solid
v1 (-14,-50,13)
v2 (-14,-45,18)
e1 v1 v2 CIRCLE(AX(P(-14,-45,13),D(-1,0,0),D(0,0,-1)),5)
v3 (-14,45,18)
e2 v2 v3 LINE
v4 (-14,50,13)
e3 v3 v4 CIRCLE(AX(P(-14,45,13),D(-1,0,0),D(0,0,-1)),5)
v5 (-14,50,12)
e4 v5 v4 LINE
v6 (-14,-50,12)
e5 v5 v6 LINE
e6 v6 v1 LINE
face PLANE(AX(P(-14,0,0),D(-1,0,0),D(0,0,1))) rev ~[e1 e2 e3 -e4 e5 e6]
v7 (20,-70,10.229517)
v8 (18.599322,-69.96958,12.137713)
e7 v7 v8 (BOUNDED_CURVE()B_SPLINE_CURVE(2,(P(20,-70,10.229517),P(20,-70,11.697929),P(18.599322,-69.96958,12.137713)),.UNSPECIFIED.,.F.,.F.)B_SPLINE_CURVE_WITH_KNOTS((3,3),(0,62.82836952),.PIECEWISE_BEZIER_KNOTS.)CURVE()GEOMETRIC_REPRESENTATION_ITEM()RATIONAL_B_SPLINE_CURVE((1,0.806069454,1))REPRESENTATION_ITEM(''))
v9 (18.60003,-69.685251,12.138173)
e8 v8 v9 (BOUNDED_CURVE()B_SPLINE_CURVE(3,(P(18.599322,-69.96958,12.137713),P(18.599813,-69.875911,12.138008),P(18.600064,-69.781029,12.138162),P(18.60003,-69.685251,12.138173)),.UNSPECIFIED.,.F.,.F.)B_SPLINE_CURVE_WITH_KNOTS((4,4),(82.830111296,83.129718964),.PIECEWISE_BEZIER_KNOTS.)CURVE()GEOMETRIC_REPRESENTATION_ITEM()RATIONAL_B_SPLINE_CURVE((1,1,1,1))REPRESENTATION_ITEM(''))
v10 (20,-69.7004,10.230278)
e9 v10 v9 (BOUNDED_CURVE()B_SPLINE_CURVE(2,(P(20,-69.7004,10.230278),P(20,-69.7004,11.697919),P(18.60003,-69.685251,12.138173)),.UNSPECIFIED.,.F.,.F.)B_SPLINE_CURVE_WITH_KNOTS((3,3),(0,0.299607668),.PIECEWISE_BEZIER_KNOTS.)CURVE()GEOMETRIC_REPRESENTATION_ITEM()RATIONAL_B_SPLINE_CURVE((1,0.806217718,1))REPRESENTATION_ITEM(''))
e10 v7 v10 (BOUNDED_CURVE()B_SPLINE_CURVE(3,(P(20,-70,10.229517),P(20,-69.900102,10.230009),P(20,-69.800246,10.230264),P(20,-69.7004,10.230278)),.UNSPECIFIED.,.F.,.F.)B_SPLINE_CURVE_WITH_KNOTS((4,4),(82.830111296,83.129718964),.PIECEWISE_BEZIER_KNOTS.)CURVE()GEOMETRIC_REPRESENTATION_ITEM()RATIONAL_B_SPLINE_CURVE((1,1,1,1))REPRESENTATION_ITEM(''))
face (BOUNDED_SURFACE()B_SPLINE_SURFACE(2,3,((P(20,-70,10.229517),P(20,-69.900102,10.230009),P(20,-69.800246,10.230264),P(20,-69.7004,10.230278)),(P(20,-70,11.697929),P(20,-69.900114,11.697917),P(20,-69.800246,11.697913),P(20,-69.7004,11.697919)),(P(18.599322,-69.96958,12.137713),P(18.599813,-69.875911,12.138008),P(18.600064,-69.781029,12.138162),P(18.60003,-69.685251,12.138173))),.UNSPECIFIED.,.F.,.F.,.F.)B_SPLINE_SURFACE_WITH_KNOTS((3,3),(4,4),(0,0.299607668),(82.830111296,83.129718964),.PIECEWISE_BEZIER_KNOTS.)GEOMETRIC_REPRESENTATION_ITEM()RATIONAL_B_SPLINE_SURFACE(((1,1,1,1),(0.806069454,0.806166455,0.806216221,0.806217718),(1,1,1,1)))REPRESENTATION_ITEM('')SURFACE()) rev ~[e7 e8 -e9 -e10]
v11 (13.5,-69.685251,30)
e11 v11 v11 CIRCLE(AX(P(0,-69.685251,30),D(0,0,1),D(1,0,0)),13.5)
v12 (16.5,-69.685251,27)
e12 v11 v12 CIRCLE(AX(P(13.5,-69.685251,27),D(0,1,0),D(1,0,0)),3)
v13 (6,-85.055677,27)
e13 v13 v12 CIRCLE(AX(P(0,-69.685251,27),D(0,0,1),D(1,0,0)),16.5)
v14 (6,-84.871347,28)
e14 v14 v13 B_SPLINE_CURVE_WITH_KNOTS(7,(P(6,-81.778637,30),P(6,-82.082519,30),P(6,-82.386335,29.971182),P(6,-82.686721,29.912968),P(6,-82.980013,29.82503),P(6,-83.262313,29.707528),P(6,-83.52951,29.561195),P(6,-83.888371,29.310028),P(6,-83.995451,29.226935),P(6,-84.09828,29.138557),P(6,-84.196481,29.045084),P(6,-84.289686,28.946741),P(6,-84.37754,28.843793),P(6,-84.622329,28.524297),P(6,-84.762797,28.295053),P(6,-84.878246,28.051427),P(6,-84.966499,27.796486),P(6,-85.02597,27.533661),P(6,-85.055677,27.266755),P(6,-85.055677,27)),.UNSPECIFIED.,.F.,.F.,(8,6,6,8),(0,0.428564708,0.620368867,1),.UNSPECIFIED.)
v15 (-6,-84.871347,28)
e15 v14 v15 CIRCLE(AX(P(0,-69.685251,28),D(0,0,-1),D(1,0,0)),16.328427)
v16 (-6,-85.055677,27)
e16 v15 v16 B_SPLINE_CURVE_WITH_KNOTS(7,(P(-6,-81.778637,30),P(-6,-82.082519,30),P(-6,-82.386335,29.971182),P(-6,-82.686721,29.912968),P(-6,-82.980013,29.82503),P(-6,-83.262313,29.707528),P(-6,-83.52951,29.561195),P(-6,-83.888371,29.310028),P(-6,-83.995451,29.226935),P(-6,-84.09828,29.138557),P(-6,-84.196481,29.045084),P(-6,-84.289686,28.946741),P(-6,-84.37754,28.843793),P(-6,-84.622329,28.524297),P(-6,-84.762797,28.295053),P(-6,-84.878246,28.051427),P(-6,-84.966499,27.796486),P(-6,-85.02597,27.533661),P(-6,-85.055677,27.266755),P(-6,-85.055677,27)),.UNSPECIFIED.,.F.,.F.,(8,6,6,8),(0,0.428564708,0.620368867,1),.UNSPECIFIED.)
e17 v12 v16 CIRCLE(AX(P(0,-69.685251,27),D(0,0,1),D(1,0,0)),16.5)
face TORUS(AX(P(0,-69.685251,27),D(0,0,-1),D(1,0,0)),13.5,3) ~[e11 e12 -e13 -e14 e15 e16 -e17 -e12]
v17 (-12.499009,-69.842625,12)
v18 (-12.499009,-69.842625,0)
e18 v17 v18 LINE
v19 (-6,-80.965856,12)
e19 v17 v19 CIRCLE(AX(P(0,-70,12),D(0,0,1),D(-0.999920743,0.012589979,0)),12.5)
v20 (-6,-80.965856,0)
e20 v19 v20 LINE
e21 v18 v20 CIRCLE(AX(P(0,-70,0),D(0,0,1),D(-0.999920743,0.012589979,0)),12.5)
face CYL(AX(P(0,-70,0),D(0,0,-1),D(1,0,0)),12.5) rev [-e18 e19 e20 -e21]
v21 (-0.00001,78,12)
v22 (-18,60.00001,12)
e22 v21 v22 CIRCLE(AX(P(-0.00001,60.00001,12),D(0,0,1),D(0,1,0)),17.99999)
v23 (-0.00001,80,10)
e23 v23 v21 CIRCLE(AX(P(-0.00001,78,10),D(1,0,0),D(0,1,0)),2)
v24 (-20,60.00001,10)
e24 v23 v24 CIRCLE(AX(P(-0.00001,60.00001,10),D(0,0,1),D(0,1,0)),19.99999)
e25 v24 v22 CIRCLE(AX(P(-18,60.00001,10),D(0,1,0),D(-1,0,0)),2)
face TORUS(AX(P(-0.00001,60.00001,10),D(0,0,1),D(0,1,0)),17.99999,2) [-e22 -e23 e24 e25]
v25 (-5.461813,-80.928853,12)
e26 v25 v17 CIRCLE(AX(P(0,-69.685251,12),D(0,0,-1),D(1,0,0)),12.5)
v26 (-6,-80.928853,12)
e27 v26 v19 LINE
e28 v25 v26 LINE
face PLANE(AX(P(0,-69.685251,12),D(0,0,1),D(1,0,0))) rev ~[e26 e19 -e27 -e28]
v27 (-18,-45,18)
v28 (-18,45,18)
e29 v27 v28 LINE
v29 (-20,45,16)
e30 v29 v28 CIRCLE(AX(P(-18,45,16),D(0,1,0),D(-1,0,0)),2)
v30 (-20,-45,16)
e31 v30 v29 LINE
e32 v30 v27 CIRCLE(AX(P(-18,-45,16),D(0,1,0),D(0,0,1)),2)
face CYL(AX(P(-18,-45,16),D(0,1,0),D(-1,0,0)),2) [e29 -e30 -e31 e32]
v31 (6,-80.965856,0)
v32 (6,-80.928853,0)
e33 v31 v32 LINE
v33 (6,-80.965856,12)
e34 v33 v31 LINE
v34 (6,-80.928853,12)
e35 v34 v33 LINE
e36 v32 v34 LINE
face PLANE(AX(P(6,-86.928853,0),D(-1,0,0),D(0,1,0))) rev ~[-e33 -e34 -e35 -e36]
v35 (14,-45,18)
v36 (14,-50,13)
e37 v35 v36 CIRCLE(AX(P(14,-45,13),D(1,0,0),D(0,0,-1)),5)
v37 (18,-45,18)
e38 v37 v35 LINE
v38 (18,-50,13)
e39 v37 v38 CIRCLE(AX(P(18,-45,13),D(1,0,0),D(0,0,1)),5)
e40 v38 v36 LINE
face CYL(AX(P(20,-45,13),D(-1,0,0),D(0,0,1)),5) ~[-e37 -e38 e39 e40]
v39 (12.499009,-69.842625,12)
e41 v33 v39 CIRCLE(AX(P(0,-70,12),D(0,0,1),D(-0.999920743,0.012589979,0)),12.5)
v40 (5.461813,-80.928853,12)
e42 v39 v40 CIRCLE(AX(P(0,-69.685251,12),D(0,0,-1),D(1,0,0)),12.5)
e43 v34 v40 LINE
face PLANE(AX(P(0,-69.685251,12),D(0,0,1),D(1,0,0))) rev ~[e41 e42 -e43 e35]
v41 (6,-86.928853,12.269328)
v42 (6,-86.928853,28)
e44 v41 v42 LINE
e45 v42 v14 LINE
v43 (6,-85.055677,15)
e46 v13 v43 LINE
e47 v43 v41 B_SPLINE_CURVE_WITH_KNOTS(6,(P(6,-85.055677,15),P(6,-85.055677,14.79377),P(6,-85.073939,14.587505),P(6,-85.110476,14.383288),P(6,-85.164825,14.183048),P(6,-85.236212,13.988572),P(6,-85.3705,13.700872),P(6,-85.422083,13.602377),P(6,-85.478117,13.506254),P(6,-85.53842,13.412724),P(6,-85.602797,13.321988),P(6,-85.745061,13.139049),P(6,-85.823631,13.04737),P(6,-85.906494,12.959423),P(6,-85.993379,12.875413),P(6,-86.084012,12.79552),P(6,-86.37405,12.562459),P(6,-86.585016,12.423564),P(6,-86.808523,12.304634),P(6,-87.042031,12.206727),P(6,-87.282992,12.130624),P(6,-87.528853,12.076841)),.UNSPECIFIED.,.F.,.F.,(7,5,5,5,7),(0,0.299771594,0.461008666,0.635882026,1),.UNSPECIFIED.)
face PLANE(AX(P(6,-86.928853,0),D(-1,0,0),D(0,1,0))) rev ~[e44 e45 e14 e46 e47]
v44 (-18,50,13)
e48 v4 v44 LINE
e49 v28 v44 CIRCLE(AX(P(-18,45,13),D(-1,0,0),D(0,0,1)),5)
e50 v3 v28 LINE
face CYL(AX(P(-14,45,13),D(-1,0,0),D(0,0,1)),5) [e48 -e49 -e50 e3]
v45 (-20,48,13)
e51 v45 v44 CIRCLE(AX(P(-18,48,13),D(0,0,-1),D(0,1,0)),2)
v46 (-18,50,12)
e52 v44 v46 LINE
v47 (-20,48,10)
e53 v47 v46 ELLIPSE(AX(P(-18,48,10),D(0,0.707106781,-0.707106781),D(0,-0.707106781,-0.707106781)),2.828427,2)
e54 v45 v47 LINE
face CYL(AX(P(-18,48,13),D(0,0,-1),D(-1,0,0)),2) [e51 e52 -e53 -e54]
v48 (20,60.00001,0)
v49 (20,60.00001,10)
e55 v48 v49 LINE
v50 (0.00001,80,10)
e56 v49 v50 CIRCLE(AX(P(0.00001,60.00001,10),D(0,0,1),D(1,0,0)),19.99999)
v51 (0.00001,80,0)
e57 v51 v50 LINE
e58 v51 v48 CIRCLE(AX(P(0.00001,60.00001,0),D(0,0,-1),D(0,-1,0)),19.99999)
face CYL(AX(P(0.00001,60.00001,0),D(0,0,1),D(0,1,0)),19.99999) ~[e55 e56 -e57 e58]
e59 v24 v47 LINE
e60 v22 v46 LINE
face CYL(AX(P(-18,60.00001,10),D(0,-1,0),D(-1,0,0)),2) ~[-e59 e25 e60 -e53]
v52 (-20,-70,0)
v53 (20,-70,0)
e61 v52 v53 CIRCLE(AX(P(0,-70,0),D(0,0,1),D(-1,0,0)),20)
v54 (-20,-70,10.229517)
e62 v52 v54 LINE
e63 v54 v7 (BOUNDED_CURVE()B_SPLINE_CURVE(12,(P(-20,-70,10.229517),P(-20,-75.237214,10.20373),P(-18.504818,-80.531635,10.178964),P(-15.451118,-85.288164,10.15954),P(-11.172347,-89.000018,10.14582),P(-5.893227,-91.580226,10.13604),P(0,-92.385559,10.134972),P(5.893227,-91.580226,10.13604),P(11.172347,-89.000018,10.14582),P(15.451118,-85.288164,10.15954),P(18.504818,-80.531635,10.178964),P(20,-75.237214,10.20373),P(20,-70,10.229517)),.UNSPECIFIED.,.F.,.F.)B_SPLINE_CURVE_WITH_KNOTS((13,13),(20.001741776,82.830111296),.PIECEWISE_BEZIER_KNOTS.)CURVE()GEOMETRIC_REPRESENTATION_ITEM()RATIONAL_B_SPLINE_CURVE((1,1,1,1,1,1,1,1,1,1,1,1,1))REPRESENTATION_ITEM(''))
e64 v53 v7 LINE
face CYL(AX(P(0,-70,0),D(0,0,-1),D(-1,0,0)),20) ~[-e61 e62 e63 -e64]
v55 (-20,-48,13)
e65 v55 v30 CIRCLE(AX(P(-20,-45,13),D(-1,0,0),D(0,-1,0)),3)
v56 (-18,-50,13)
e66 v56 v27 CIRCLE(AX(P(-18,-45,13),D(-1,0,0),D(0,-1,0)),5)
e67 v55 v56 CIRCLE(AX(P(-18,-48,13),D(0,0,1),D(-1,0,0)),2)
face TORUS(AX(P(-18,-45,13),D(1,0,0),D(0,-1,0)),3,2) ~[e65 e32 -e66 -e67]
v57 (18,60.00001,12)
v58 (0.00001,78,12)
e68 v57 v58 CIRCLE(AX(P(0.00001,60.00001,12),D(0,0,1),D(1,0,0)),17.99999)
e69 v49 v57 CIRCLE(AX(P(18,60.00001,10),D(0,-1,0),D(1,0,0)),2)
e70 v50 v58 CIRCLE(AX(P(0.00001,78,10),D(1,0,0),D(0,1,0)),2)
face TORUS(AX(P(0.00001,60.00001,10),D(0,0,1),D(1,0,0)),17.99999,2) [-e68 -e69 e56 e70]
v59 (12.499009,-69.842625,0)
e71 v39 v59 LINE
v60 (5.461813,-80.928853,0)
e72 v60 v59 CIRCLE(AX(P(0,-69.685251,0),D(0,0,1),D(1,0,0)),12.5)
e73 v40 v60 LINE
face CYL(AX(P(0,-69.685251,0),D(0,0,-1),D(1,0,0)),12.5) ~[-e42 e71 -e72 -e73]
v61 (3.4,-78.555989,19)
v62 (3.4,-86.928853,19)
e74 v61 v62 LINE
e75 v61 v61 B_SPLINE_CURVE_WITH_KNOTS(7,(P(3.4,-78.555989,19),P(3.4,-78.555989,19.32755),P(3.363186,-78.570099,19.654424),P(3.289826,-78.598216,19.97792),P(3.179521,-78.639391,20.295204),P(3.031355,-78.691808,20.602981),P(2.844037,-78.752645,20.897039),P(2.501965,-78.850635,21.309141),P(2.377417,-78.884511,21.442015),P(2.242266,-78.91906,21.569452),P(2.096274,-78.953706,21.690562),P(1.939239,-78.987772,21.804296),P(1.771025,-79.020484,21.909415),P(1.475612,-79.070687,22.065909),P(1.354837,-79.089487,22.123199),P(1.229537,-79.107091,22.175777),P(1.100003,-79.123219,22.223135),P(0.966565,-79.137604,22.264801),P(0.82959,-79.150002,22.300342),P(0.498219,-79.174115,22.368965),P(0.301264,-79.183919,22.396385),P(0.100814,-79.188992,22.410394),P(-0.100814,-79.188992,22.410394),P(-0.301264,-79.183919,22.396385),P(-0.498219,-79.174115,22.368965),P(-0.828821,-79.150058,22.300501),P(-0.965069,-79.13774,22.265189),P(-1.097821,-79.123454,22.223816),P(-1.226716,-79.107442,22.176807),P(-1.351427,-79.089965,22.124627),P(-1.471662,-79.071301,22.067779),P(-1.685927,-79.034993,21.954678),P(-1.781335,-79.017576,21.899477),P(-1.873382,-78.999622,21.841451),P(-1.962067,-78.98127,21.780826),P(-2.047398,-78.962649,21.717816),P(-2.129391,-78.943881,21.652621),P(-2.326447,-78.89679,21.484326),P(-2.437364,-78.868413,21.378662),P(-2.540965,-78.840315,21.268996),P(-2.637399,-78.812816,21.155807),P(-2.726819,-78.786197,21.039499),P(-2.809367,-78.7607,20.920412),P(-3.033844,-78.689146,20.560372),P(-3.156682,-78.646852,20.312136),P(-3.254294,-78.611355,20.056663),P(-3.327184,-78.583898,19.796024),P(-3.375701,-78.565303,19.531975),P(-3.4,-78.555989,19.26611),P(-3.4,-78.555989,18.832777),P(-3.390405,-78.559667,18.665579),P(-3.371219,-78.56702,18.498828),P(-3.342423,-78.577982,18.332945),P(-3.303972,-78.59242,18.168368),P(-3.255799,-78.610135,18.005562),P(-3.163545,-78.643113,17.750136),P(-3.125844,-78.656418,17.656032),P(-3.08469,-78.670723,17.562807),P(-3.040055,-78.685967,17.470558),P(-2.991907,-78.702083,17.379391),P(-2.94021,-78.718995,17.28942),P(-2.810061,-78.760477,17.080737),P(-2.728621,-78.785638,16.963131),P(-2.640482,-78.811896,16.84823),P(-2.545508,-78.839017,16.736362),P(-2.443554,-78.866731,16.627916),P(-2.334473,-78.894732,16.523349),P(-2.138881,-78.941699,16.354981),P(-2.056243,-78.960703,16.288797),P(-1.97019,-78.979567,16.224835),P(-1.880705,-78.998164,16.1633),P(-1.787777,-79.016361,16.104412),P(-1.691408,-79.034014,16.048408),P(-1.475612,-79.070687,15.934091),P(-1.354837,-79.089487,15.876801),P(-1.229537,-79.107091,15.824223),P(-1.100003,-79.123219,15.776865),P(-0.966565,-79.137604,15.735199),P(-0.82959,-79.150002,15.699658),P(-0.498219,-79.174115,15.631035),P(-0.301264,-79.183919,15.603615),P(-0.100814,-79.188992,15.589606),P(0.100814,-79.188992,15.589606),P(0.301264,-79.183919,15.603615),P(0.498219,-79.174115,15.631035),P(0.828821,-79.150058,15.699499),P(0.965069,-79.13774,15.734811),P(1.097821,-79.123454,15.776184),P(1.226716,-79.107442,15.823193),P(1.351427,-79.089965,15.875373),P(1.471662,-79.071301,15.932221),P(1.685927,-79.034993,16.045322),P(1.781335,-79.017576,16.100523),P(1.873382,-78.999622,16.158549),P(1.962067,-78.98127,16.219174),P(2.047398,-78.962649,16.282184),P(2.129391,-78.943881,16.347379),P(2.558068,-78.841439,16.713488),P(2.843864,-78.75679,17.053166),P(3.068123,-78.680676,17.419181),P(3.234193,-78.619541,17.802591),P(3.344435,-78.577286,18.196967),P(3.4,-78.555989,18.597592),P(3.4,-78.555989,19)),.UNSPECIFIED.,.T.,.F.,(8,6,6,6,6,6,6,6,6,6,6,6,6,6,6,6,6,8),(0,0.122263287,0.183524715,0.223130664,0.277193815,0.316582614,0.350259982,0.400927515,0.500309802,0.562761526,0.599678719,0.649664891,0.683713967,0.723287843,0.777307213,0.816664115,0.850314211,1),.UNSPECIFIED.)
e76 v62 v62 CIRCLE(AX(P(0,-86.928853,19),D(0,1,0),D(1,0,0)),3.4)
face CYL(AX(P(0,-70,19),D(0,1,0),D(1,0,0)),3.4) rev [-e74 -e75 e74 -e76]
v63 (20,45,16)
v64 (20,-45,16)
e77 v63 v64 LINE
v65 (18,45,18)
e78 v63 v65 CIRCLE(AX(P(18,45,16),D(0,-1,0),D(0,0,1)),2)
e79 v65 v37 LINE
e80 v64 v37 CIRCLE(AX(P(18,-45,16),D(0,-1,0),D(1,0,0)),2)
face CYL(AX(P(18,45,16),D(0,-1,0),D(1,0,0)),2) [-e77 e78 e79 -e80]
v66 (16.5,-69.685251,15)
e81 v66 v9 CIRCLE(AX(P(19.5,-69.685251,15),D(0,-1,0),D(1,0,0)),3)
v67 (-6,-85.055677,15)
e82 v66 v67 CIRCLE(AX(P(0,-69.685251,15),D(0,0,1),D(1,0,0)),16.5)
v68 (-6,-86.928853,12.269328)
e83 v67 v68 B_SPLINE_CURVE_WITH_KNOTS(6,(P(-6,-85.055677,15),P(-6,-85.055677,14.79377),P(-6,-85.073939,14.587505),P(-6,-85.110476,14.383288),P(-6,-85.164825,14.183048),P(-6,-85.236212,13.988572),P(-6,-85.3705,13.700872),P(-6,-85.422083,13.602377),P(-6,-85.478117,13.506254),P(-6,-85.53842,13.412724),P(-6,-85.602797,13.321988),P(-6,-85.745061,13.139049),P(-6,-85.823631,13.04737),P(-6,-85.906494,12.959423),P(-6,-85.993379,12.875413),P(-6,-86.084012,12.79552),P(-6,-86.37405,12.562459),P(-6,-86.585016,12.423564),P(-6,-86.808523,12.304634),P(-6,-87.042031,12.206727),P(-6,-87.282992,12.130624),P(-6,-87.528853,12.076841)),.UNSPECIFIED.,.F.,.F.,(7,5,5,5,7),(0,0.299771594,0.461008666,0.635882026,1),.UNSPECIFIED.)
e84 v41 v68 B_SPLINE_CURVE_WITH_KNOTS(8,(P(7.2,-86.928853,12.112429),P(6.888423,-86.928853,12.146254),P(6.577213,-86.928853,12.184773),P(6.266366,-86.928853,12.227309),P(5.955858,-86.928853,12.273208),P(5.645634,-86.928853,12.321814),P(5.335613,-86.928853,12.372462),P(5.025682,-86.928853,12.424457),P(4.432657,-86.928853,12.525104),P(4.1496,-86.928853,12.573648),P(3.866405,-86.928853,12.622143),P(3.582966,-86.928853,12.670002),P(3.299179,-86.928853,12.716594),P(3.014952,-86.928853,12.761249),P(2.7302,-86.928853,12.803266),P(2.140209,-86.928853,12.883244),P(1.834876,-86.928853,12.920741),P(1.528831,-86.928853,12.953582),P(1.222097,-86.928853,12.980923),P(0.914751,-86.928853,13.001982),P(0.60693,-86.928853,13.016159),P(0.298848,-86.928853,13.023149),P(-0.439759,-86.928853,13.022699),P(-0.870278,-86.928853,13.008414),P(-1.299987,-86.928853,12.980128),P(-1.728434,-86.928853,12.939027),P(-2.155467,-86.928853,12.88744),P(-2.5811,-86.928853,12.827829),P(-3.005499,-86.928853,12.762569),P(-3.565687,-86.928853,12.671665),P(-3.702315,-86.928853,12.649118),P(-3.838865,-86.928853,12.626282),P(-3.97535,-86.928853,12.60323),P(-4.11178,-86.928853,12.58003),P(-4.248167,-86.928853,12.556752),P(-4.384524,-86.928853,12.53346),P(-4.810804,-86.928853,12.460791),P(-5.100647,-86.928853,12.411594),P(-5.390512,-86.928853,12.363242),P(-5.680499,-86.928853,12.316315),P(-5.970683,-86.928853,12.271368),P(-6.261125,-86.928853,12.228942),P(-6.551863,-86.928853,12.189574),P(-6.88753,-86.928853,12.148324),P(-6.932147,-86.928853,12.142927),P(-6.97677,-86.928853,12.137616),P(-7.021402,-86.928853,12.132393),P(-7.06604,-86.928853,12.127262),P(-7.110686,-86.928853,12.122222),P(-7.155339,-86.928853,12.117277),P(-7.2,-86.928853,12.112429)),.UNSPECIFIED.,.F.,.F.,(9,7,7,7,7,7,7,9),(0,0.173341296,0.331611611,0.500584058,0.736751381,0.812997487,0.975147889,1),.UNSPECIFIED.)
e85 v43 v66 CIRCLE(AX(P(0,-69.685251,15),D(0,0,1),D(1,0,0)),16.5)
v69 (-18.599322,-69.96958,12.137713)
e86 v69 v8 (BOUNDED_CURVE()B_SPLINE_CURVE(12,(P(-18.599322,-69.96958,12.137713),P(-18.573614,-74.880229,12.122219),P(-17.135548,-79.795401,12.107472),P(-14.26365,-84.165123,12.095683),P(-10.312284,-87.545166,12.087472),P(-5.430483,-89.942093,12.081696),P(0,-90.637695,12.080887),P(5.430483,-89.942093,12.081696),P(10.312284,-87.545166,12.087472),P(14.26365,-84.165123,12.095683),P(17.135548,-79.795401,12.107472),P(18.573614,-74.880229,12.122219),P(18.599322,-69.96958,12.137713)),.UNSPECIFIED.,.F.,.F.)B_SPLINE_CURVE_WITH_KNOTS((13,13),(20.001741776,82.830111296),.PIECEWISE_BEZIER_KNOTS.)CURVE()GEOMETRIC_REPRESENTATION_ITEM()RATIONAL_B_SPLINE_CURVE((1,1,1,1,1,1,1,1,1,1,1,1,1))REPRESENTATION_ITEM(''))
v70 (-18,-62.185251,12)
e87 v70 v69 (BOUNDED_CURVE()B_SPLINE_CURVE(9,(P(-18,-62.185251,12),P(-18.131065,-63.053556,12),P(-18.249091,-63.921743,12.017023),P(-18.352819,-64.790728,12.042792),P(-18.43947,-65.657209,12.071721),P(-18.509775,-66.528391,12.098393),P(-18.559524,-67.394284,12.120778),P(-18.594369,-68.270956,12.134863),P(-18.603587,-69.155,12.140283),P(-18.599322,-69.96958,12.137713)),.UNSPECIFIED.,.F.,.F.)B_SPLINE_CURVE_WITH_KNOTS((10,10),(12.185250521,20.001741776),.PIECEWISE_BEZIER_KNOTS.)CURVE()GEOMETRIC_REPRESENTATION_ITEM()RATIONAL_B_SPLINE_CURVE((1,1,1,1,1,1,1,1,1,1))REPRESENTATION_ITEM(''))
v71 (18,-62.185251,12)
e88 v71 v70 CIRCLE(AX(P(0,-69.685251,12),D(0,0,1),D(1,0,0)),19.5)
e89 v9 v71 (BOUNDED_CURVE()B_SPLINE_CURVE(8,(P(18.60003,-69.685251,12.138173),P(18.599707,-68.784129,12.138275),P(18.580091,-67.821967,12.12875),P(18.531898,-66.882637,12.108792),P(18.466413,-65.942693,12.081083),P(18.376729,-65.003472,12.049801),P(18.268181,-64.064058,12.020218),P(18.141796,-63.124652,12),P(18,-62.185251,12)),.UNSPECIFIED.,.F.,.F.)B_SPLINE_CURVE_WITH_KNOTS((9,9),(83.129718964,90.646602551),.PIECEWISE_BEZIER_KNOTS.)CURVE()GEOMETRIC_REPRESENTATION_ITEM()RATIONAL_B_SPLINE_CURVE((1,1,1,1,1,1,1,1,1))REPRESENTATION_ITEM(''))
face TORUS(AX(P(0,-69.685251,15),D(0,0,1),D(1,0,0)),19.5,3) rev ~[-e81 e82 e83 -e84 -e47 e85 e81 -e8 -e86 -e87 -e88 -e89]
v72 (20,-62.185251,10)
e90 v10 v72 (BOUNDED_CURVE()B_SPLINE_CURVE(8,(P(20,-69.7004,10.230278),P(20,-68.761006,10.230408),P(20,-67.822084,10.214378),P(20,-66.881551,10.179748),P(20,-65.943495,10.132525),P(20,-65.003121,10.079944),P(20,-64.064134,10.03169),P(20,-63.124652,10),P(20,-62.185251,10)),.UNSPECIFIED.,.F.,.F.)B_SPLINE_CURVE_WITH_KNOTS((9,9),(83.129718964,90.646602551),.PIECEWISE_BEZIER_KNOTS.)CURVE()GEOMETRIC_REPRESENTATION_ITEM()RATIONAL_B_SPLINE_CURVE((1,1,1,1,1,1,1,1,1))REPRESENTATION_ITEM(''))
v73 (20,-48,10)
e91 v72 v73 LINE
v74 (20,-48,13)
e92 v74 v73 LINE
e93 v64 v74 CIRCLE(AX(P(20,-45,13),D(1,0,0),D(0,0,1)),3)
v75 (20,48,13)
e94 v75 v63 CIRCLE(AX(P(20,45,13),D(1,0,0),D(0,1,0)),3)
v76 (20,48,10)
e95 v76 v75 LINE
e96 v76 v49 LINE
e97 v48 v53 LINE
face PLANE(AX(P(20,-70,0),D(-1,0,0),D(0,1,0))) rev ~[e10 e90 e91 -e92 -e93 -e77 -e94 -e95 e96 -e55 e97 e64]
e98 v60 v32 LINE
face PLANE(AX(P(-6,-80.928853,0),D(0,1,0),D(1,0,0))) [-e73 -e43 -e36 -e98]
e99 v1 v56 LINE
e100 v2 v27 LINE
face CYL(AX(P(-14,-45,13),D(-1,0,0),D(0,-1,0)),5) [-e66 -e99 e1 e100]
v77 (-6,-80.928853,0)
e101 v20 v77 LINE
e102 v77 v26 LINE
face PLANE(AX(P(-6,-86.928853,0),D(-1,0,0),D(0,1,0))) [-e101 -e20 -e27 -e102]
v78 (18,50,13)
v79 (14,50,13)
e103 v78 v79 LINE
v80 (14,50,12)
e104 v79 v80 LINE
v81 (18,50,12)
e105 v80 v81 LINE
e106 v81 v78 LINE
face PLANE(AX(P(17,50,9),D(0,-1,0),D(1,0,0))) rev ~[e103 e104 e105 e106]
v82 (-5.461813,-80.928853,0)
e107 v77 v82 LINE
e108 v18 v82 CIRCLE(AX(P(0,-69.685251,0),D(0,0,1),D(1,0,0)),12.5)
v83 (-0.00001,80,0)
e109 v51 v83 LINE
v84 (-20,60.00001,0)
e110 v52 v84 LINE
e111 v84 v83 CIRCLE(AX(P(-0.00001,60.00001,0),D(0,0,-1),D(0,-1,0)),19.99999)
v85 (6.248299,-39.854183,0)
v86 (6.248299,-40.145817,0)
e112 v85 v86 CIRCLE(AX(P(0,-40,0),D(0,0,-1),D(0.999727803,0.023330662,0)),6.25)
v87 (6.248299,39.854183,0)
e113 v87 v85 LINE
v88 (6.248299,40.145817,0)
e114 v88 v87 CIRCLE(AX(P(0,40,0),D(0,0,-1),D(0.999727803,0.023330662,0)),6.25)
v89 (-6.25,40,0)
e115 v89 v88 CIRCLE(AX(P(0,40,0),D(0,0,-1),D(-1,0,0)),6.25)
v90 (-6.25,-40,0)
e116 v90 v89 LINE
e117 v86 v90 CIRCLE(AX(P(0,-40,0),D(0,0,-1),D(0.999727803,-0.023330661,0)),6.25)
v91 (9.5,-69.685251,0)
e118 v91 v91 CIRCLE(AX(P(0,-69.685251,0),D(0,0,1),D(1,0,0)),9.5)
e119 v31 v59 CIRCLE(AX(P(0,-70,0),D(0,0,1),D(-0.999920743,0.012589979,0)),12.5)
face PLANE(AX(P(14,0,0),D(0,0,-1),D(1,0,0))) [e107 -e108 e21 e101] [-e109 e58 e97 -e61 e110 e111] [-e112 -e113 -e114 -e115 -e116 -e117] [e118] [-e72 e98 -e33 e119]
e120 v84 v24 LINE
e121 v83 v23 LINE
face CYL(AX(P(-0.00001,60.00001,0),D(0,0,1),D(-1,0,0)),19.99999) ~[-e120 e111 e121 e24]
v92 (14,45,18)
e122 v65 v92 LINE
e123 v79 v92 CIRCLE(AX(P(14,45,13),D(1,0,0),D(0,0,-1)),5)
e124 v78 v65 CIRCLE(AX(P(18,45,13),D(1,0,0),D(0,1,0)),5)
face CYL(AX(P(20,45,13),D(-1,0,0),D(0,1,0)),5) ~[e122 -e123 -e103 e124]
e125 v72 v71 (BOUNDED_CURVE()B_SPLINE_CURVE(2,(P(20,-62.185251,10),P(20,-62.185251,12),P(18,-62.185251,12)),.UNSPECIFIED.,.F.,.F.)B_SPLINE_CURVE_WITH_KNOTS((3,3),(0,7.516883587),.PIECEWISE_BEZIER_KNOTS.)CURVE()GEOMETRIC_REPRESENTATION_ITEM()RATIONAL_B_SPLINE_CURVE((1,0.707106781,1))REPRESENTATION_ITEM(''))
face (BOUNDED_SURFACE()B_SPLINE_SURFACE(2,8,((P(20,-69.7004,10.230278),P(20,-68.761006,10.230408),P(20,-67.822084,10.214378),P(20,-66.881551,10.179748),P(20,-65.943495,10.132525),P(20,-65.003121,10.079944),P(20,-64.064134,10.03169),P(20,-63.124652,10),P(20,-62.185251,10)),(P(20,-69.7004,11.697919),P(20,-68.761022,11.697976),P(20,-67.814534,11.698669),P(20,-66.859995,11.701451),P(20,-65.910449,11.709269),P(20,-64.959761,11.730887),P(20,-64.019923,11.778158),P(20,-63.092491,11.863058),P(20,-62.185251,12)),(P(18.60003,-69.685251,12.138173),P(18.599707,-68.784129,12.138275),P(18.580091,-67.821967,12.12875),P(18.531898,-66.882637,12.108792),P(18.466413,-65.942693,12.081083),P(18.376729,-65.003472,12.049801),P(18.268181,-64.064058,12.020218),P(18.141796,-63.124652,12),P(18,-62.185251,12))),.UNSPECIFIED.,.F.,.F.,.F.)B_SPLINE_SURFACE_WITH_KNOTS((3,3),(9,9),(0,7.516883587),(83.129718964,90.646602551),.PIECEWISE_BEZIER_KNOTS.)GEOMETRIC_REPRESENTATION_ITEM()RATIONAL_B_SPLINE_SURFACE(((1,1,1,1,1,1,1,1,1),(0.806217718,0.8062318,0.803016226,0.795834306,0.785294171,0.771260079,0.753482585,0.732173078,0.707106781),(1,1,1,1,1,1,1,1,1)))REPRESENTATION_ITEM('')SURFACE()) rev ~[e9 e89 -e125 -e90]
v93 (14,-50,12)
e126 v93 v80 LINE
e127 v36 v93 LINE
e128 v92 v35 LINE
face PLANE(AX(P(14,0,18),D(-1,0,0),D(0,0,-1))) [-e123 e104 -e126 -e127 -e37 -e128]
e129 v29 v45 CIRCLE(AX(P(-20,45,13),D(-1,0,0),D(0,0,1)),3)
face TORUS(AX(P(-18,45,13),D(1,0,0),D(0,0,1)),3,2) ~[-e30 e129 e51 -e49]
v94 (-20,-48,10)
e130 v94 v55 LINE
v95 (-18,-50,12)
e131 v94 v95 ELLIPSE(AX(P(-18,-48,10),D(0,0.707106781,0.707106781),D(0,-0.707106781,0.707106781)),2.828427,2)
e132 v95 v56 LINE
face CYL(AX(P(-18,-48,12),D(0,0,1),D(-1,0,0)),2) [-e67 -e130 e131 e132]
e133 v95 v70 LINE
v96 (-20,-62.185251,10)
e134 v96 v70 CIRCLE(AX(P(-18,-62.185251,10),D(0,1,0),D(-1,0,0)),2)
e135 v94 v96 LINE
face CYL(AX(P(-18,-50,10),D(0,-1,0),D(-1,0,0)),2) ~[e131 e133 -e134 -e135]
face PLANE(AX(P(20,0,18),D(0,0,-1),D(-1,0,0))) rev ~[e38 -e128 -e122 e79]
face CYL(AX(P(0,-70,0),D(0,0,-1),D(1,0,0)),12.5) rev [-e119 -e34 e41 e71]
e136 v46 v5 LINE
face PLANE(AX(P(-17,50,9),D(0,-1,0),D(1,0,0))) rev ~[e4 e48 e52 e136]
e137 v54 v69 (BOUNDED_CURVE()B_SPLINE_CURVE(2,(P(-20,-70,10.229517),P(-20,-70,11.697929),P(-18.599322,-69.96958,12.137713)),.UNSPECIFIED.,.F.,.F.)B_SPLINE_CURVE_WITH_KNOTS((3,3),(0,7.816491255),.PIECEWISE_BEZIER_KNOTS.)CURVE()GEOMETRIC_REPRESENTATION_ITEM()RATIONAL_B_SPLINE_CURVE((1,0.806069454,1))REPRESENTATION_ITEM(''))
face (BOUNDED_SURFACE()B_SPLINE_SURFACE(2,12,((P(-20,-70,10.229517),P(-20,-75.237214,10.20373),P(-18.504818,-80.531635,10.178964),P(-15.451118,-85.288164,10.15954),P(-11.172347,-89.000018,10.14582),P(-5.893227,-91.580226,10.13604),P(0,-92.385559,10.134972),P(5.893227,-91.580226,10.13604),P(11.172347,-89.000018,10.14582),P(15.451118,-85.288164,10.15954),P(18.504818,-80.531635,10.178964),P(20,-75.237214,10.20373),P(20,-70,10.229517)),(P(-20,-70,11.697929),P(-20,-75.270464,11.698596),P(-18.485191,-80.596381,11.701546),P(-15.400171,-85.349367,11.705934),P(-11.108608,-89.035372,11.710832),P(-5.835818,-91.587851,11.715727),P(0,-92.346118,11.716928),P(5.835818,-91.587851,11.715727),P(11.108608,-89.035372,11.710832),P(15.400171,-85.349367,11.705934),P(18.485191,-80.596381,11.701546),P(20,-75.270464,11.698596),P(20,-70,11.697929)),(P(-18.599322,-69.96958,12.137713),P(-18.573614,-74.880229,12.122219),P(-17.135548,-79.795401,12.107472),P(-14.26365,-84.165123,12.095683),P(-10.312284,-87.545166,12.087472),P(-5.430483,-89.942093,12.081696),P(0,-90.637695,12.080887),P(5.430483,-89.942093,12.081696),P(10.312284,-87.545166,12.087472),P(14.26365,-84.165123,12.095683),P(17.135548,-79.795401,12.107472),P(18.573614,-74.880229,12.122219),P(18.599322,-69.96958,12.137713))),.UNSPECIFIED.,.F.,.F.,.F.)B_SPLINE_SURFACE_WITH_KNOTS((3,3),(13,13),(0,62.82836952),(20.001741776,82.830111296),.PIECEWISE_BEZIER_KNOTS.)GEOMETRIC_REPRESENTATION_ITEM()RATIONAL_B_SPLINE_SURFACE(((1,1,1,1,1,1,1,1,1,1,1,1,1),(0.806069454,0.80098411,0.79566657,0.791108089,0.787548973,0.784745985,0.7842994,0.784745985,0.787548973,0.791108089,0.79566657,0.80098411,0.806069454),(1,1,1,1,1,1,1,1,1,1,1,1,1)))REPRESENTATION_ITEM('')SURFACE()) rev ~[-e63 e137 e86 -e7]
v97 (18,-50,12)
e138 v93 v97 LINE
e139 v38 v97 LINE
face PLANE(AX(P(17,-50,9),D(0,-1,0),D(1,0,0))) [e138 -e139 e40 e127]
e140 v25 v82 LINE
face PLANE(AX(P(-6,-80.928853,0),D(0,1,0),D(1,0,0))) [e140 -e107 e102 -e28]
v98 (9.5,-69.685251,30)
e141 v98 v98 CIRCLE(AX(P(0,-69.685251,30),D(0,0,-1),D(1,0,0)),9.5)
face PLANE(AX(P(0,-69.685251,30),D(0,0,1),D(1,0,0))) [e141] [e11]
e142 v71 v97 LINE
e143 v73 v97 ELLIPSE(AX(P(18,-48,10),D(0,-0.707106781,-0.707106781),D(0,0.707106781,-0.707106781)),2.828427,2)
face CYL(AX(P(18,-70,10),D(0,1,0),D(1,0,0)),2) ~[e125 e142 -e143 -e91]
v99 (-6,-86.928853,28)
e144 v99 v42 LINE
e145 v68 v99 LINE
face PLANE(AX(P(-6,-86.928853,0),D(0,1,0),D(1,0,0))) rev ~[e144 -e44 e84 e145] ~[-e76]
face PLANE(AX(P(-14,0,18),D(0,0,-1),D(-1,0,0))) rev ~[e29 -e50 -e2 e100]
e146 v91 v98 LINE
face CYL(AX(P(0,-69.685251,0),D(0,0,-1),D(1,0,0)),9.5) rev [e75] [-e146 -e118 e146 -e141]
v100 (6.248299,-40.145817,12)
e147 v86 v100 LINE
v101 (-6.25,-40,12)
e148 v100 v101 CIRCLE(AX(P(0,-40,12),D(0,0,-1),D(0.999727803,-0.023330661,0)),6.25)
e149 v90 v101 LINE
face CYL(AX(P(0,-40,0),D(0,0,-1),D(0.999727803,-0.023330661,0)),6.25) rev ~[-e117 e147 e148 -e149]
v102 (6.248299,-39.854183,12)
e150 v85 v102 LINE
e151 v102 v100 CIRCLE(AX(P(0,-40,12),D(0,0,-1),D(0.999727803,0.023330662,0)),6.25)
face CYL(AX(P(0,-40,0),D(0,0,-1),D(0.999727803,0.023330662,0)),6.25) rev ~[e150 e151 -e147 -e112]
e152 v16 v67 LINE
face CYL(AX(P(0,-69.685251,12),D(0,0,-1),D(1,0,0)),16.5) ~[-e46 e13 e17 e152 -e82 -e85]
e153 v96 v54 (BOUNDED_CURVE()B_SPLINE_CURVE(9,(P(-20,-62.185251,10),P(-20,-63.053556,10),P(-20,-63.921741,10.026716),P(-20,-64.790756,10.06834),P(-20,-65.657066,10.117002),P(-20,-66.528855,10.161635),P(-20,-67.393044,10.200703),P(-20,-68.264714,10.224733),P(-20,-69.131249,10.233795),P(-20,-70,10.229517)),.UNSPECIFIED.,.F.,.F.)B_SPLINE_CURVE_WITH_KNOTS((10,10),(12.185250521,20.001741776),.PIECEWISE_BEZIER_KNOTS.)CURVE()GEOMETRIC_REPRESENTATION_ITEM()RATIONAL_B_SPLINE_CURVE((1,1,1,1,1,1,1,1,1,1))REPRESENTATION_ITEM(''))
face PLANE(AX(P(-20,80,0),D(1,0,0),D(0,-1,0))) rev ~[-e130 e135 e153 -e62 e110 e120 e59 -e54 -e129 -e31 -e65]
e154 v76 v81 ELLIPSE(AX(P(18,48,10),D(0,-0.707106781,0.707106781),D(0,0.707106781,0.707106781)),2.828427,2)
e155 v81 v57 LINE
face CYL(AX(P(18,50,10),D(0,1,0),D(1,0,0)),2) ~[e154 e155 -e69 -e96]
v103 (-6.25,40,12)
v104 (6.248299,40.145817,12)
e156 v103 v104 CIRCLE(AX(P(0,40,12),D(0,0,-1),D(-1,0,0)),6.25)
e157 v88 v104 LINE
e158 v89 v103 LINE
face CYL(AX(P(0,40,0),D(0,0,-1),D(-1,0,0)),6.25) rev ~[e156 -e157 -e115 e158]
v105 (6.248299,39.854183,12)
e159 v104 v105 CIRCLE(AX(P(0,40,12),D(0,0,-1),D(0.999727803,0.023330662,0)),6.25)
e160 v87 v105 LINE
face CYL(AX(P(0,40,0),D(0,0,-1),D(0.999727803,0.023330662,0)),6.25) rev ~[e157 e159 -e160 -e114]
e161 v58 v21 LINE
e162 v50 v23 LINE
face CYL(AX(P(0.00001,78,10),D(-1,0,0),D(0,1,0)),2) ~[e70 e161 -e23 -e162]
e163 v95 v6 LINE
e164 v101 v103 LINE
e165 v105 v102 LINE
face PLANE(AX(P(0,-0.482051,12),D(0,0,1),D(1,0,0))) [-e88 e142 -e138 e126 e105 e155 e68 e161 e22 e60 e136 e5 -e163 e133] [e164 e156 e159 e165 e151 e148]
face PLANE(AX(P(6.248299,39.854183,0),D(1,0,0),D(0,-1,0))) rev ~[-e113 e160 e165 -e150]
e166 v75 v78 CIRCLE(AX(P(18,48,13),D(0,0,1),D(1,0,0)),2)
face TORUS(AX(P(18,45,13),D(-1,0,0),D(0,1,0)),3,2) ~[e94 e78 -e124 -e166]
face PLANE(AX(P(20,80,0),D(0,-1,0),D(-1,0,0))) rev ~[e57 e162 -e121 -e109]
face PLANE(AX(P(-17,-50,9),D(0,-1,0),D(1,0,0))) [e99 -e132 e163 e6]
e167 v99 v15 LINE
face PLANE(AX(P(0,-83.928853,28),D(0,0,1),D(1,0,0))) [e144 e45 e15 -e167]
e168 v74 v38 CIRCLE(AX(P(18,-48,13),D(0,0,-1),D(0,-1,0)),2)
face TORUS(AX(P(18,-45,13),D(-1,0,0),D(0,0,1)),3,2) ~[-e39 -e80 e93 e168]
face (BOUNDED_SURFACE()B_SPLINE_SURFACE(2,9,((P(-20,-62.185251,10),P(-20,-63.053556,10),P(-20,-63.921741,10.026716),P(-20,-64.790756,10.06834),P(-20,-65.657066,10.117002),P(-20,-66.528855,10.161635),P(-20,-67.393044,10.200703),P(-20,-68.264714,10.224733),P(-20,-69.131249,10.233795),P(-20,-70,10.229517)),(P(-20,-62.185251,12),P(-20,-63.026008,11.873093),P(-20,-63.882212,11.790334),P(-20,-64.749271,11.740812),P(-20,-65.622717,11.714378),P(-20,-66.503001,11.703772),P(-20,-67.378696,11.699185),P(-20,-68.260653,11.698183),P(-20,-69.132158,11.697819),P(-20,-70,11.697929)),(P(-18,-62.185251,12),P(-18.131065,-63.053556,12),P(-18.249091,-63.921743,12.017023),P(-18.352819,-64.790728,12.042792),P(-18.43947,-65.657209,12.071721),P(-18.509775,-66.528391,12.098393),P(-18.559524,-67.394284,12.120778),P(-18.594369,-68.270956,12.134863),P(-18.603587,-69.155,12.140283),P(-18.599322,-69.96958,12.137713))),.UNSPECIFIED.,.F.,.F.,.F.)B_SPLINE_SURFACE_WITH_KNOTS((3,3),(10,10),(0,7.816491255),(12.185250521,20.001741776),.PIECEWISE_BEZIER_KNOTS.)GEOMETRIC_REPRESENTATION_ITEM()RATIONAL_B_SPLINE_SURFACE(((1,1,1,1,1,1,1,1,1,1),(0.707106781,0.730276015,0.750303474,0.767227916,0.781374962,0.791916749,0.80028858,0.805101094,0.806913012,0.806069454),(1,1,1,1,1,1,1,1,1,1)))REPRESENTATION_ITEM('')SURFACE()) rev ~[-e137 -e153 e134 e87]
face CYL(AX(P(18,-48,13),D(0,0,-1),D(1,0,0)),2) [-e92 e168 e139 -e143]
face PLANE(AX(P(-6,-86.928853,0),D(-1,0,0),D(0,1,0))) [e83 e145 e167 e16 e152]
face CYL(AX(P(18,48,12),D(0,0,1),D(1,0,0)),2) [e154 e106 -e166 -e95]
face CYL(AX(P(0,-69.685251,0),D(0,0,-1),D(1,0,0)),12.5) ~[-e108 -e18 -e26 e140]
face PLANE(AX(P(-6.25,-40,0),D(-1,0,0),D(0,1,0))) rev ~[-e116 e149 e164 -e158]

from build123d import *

# Parameters (mm, degrees)
F0_R          = 12.5
F1_DEPTH      = 12
F3_START      = 12
F2_R          = 16.5
F2_R_2        = 12.5
F2_R_3        = 9.5
F3_DEPTH      = 18
F4_DEPTH      = 30
F5_R          = 9.5
F6_DEPTH      = 25
F6_DEPTH_BACK = 100
F7_R          = 3
F9_DEPTH      = 50
F9_DEPTH_BACK = 50
F10_R         = 5
F11_R         = 19.99999
F12_W         = 12
F12_H         = 6
F13_DEPTH     = 28
F15_START     = 70
F14_R         = 3.4
F15_DEPTH     = 30
F16_R         = 2


# Not quite as in the source:
# - a fillet or chamfer is up to 0.001 mm smaller than in the source, because OpenCascade refuses the exact size


with BuildPart() as f1:
    # F0 (on Top) → F1 (new body)
    with BuildSketch(Plane.XY):
        with BuildLine():
            Line((20, -70), (20, 80))
            Line((20, 80), (-20, 80))
            Line((-20, 80), (-20, -70))
            ThreePointArc((-20, -70), (0, -90), (20, -70))
        make_face()
        with Locations((0, -70)):
            Circle(F0_R, mode=Mode.SUBTRACT)
        with BuildLine():
            ThreePointArc((6.2482987692, -40.1458166336), (-0.0729132787, -46.2495746778), (-6.25, -40))
            Line((-6.25, -40), (-6.25, 40))
            ThreePointArc((-6.25, 40), (-0.0729132787, 46.2495746778), (6.2482987692, 40.1458166336))
            ThreePointArc((6.2482987692, 40.1458166336), (6.25, 40), (6.2482987692, 39.8541833664))
            Line((6.2482987692, 39.8541833664), (6.2482987692, -39.8541833664))
            ThreePointArc((6.2482987692, -39.8541833664), (6.25, -40), (6.2482987692, -40.1458166336))
        make_face(mode=Mode.SUBTRACT)
    extrude(amount=F1_DEPTH)

    # F2 (on Top) → F3 (join)
    with BuildSketch(Plane.XY.offset(F3_START)):
        with Locations((0, -69.6852505207)):
            Circle(F2_R)
        with Locations((0, -69.6852505207)):
            Circle(F2_R_2, mode=Mode.SUBTRACT)
        with Locations((0, -69.6852505207)):
            Circle(F2_R_2)
        with Locations((0, -69.6852505207)):
            Circle(F2_R_3, mode=Mode.SUBTRACT)
    extrude(amount=F3_DEPTH)

    # F2 (on Top) → F4 (join)
    with BuildSketch(Plane.XY):
        with Locations((0, -69.6852505207)):
            Circle(F2_R_2)
        with Locations((0, -69.6852505207)):
            Circle(F2_R_3, mode=Mode.SUBTRACT)
        with Locations((0, -69.6852505207)):
            Circle(F2_R_3)
    extrude(amount=F4_DEPTH)

    # F5 (on Top) → F6 (cut, two sides)
    with BuildSketch(Plane.XY) as f6_sk:
        with Locations((0, -69.6852505207)):
            Circle(F5_R)
    extrude(amount=-F6_DEPTH, mode=Mode.SUBTRACT)
    extrude(f6_sk.sketch, amount=F6_DEPTH_BACK, mode=Mode.SUBTRACT)

    # F7
    f7_edges = [f1.edges().sort_by_distance(p)[0] for p in [
        (-16.5, -69.685251, 30),
        (-16.5, -69.685251, 12),
    ]]
    fillet(f7_edges, radius=F7_R)

    # F8 (on Front) → F9 (join, two sides)
    with BuildSketch(Plane.XZ) as f9_sk:
        Polygon((14, 0), (20, 0), (20, 18), (14, 18), (14, 12), align=None)
        Polygon((-14, 0), (-14, 12), (-14, 18), (-20, 18), (-20, 0), align=None)
    extrude(amount=F9_DEPTH)
    extrude(f9_sk.sketch, amount=-F9_DEPTH_BACK)

    # F10
    f10_edges = [f1.edges().sort_by_distance(p)[0] for p in [
        (17, 50, 18),
        (-17, 50, 18),
        (-17, -50, 18),
        (17, -50, 18),
    ]]
    fillet(f10_edges, radius=F10_R)

    # F11 (radius 20 in the source; OpenCascade refuses exactly that, so slightly less here)
    f11_edges = [f1.edges().sort_by_distance(p)[0] for p in [
        (-20, 80, 6),
        (20, 80, 6),
    ]]
    fillet(f11_edges, radius=F11_R)

    # F12 (on Top) → F13 (join)
    with BuildSketch(Plane.XY):
        with Locations((0, -83.9288532734)):
            Rectangle(F12_W, F12_H)
    extrude(amount=F13_DEPTH)

    # F14 (on Front) → F15 (cut)
    with BuildSketch(Plane.XZ.offset(F15_START)):
        with Locations((0, 19)):
            Circle(F14_R)
    extrude(amount=F15_DEPTH, mode=Mode.SUBTRACT)

    # F16
    f16_edges = [f1.edges().sort_by_distance(p)[0] for p in [
        (20, 55.000005, 12),
        (-14.142139, 74.142139, 12),
        (-20, 55.000005, 12),
        (20, -60, 12),
        (-20, -48.535534, 16.535534),
        (-20, 0, 18),
        (20, 0, 18),
        (20, -48.535534, 16.535534),
    ]]
    fillet(f16_edges, radius=F16_R)


solid = f1.part
